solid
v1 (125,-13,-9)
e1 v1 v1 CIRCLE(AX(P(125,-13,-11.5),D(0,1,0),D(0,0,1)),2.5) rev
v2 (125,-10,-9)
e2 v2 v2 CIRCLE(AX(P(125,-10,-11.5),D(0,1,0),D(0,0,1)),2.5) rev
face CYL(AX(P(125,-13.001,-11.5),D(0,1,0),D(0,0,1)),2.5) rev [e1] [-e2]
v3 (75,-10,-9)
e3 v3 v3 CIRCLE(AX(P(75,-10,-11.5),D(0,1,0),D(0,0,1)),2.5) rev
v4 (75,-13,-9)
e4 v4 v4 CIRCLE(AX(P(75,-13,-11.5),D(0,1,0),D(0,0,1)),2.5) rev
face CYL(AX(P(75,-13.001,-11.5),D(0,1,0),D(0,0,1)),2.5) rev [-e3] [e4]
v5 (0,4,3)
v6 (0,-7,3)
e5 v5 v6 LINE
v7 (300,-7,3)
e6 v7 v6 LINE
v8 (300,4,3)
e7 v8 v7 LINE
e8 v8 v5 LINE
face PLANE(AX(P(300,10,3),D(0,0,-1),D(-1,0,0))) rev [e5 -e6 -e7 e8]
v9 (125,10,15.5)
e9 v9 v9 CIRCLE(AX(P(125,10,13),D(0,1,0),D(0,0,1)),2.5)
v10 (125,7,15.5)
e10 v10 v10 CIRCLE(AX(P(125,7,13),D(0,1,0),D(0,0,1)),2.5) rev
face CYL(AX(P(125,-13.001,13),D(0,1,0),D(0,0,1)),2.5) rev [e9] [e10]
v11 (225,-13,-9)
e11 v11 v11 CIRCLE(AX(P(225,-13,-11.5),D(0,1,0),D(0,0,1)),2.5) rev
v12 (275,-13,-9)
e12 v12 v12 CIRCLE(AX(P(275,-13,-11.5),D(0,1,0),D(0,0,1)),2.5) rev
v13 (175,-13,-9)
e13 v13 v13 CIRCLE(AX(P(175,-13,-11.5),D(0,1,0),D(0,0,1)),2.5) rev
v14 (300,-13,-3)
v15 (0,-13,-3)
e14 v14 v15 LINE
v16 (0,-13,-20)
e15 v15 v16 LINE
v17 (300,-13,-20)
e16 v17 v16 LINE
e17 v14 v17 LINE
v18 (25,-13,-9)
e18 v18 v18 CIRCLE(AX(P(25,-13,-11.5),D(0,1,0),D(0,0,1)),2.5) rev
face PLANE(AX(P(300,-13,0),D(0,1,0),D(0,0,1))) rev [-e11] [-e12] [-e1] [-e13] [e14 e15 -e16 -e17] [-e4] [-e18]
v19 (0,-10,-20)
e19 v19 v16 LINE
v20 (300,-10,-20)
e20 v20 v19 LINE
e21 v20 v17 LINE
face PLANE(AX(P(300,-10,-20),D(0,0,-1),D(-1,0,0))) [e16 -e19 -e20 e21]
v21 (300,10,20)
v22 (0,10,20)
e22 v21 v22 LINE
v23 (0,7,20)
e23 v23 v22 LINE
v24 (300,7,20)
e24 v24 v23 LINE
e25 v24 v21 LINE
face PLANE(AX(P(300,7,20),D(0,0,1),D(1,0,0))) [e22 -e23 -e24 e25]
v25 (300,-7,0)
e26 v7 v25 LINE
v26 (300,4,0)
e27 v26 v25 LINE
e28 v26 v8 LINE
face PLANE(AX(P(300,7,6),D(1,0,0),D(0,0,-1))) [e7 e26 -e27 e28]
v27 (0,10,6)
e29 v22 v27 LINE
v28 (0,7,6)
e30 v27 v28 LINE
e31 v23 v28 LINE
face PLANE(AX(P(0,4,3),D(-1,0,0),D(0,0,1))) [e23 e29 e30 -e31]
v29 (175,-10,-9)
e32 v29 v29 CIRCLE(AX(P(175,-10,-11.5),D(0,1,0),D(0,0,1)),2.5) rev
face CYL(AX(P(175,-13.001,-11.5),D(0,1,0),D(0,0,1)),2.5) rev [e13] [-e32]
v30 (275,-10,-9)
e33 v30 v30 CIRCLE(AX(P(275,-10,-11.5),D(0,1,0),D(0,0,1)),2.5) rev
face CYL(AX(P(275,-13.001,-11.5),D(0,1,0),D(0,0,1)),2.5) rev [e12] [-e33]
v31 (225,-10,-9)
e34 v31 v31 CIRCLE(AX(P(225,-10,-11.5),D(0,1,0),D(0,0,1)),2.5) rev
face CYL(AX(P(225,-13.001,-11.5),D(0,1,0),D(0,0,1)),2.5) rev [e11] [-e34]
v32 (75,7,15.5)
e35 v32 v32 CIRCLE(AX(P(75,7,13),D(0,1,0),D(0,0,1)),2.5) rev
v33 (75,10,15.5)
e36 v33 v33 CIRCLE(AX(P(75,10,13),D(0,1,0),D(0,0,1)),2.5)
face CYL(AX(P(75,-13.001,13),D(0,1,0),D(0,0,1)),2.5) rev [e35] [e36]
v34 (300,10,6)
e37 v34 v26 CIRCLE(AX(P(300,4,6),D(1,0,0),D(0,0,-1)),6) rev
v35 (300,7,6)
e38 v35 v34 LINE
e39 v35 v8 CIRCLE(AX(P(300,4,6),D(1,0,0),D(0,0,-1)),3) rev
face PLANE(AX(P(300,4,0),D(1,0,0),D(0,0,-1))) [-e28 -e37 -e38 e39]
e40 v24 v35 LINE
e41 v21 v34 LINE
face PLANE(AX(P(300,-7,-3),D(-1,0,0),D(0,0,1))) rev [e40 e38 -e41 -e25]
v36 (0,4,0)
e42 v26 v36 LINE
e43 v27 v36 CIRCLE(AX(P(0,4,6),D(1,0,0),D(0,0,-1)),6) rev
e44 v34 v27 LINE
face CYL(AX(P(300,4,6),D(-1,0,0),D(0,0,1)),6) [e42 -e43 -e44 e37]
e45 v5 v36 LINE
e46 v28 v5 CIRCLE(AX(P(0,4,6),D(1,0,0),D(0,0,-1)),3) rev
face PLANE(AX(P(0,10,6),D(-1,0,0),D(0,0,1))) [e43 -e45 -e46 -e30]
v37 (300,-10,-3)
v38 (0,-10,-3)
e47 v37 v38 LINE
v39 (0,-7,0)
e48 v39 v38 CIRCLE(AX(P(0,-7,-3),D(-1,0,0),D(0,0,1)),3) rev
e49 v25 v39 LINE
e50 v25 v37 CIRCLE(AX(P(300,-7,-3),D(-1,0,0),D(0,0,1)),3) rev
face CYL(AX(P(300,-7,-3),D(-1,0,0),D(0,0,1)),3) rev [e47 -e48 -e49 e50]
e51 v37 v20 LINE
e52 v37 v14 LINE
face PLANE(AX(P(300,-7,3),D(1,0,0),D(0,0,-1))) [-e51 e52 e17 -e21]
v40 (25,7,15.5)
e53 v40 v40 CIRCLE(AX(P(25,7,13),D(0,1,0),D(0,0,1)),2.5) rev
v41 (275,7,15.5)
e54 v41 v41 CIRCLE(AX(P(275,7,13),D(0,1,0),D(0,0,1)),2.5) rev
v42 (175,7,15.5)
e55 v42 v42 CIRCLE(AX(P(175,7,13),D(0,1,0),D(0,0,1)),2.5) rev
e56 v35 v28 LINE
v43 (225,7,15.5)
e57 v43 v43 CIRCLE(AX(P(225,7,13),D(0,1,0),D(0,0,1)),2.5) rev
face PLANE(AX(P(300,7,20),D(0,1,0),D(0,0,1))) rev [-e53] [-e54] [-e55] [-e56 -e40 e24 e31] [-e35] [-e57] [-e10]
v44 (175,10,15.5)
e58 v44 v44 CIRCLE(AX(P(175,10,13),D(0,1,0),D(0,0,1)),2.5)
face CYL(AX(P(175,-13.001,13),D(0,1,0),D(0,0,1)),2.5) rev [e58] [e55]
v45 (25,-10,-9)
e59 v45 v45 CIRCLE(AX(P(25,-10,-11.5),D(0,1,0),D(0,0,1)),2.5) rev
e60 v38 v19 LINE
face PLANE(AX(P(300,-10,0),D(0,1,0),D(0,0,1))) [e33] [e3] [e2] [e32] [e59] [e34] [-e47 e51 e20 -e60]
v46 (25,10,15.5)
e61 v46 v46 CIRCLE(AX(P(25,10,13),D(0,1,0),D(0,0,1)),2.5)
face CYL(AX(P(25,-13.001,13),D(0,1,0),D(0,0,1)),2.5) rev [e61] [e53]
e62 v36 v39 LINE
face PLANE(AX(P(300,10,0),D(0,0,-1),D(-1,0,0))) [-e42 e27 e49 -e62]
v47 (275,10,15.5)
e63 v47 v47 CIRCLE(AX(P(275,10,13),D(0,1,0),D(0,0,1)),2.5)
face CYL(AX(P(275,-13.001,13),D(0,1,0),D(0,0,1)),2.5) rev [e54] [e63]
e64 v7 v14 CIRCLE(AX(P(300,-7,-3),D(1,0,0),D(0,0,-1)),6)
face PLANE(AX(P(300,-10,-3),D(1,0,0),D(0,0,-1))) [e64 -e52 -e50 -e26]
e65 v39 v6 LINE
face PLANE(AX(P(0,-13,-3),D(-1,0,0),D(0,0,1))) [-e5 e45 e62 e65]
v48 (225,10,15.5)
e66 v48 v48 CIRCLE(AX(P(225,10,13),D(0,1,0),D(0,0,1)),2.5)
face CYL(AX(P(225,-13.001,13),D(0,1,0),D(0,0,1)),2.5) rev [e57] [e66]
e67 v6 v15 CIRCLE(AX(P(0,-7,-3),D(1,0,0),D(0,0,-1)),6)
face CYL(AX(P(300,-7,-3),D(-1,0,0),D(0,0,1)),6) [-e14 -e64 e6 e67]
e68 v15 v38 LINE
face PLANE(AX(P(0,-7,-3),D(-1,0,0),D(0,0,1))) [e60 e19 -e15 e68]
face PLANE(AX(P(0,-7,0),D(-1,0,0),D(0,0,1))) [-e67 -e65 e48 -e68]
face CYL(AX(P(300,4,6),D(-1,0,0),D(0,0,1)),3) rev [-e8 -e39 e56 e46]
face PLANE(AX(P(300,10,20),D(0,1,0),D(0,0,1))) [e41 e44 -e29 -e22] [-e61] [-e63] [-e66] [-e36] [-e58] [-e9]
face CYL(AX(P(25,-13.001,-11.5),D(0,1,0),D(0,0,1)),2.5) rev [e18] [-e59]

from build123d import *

# Parameters (mm, degrees)
BASE_FLANGE1_DEPTH = 300
CUT_EXTRUDE1_REACH = 303.544
SKETCH6_R          = 2.5


# Sheet-metal steps are written as plain solids
with BuildPart() as part:
    # Sketch1 → Base-Flange1 (new body)
    with BuildSketch(Plane(origin=(0, 0, 0), x_dir=(0, 0, -1), z_dir=(1, 0, 0))):
        with BuildLine():
            Line((-20, 10), (-6, 10))
            ThreePointArc((-6, 10), (-1.757359313, 8.242640687), (0, 4))
            Line((0, 4), (0, -7))
            ThreePointArc((0, -7), (0.878679656, -9.121320344), (3, -10))
            Line((3, -10), (20, -10))
            Line((20, -10), (20, -13))
            Line((20, -13), (3, -13))
            ThreePointArc((3, -13), (-1.242640687, -11.242640687), (-3, -7))
            Line((-3, -7), (-3, 4))
            ThreePointArc((-3, 4), (-3.878679656, 6.121320344), (-6, 7))
            Line((-6, 7), (-20, 7))
            Line((-20, 7), (-20, 10))
        make_face()
    extrude(amount=BASE_FLANGE1_DEPTH)

    # Sketch6 → Cut-Extrude1 (cut, up to next)
    with BuildSketch(Plane(origin=(0, 10, 0), x_dir=(1, 0, 0), z_dir=(0, 1, 0)), mode=Mode.PRIVATE) as cut_extrude1_sk1:
        with Locations(Location((25, -13, 0), (0, 0, 270))):
            Circle(SKETCH6_R)
    cut_extrude1_tool1 = extrude(cut_extrude1_sk1.sketch, amount=-CUT_EXTRUDE1_REACH, mode=Mode.PRIVATE) & part.part
    # Sketch6 → Cut-Extrude1 (cut, up to next)
    with BuildSketch(Plane(origin=(0, 10, 0), x_dir=(1, 0, 0), z_dir=(0, 1, 0)), mode=Mode.PRIVATE) as cut_extrude1_sk2:
        with Locations(Location((75, -13, 0), (0, 0, 270))):
            Circle(SKETCH6_R)
    cut_extrude1_tool2 = extrude(cut_extrude1_sk2.sketch, amount=-CUT_EXTRUDE1_REACH, mode=Mode.PRIVATE) & part.part
    # Sketch6 → Cut-Extrude1 (cut, up to next)
    with BuildSketch(Plane(origin=(0, 10, 0), x_dir=(1, 0, 0), z_dir=(0, 1, 0)), mode=Mode.PRIVATE) as cut_extrude1_sk3:
        with Locations(Location((125, -13, 0), (0, 0, 270))):
            Circle(SKETCH6_R)
    cut_extrude1_tool3 = extrude(cut_extrude1_sk3.sketch, amount=-CUT_EXTRUDE1_REACH, mode=Mode.PRIVATE) & part.part
    # Sketch6 → Cut-Extrude1 (cut, up to next)
    with BuildSketch(Plane(origin=(0, 10, 0), x_dir=(1, 0, 0), z_dir=(0, 1, 0)), mode=Mode.PRIVATE) as cut_extrude1_sk4:
        with Locations(Location((175, -13, 0), (0, 0, 270))):
            Circle(SKETCH6_R)
    cut_extrude1_tool4 = extrude(cut_extrude1_sk4.sketch, amount=-CUT_EXTRUDE1_REACH, mode=Mode.PRIVATE) & part.part
    # Sketch6 → Cut-Extrude1 (cut, up to next)
    with BuildSketch(Plane(origin=(0, 10, 0), x_dir=(1, 0, 0), z_dir=(0, 1, 0)), mode=Mode.PRIVATE) as cut_extrude1_sk5:
        with Locations(Location((225, -13, 0), (0, 0, 270))):
            Circle(SKETCH6_R)
    cut_extrude1_tool5 = extrude(cut_extrude1_sk5.sketch, amount=-CUT_EXTRUDE1_REACH, mode=Mode.PRIVATE) & part.part
    # Sketch6 → Cut-Extrude1 (cut, up to next)
    with BuildSketch(Plane(origin=(0, 10, 0), x_dir=(1, 0, 0), z_dir=(0, 1, 0)), mode=Mode.PRIVATE) as cut_extrude1_sk6:
        with Locations(Location((275, -13, 0), (0, 0, 270))):
            Circle(SKETCH6_R)
    cut_extrude1_tool6 = extrude(cut_extrude1_sk6.sketch, amount=-CUT_EXTRUDE1_REACH, mode=Mode.PRIVATE) & part.part
    # Sketch6 → Cut-Extrude1 (cut, up to next)
    with BuildSketch(Plane(origin=(0, 10, 0), x_dir=(1, 0, 0), z_dir=(0, 1, 0)), mode=Mode.PRIVATE) as cut_extrude1_sk7:
        with Locations(Location((75, 11.5, 0), (0, 0, 270))):
            Circle(SKETCH6_R)
    cut_extrude1_tool7 = extrude(cut_extrude1_sk7.sketch, amount=-CUT_EXTRUDE1_REACH, mode=Mode.PRIVATE) & part.part
    # Sketch6 → Cut-Extrude1 (cut, up to next)
    with BuildSketch(Plane(origin=(0, 10, 0), x_dir=(1, 0, 0), z_dir=(0, 1, 0)), mode=Mode.PRIVATE) as cut_extrude1_sk8:
        with Locations(Location((125, 11.5, 0), (0, 0, 270))):
            Circle(SKETCH6_R)
    cut_extrude1_tool8 = extrude(cut_extrude1_sk8.sketch, amount=-CUT_EXTRUDE1_REACH, mode=Mode.PRIVATE) & part.part
    # Sketch6 → Cut-Extrude1 (cut, up to next)
    with BuildSketch(Plane(origin=(0, 10, 0), x_dir=(1, 0, 0), z_dir=(0, 1, 0)), mode=Mode.PRIVATE) as cut_extrude1_sk9:
        with Locations(Location((175, 11.5, 0), (0, 0, 270))):
            Circle(SKETCH6_R)
    cut_extrude1_tool9 = extrude(cut_extrude1_sk9.sketch, amount=-CUT_EXTRUDE1_REACH, mode=Mode.PRIVATE) & part.part
    # Sketch6 → Cut-Extrude1 (cut, up to next)
    with BuildSketch(Plane(origin=(0, 10, 0), x_dir=(1, 0, 0), z_dir=(0, 1, 0)), mode=Mode.PRIVATE) as cut_extrude1_sk10:
        with Locations(Location((225, 11.5, 0), (0, 0, 270))):
            Circle(SKETCH6_R)
    cut_extrude1_tool10 = extrude(cut_extrude1_sk10.sketch, amount=-CUT_EXTRUDE1_REACH, mode=Mode.PRIVATE) & part.part
    # Sketch6 → Cut-Extrude1 (cut, up to next)
    with BuildSketch(Plane(origin=(0, 10, 0), x_dir=(1, 0, 0), z_dir=(0, 1, 0)), mode=Mode.PRIVATE) as cut_extrude1_sk11:
        with Locations(Location((275, 11.5, 0), (0, 0, 270))):
            Circle(SKETCH6_R)
    cut_extrude1_tool11 = extrude(cut_extrude1_sk11.sketch, amount=-CUT_EXTRUDE1_REACH, mode=Mode.PRIVATE) & part.part
    # Sketch6 → Cut-Extrude1 (cut, up to next)
    with BuildSketch(Plane(origin=(0, 10, 0), x_dir=(1, 0, 0), z_dir=(0, 1, 0)), mode=Mode.PRIVATE) as cut_extrude1_sk12:
        with Locations(Location((25, 11.5, 0), (0, 0, 270))):
            Circle(SKETCH6_R)
    cut_extrude1_tool12 = extrude(cut_extrude1_sk12.sketch, amount=-CUT_EXTRUDE1_REACH, mode=Mode.PRIVATE) & part.part
    add(cut_extrude1_tool1.solids().sort_by_distance((25, 10, 13))[0], mode=Mode.SUBTRACT)
    add(cut_extrude1_tool2.solids().sort_by_distance((75, 10, 13))[0], mode=Mode.SUBTRACT)
    add(cut_extrude1_tool3.solids().sort_by_distance((125, 10, 13))[0], mode=Mode.SUBTRACT)
    add(cut_extrude1_tool4.solids().sort_by_distance((175, 10, 13))[0], mode=Mode.SUBTRACT)
    add(cut_extrude1_tool5.solids().sort_by_distance((225, 10, 13))[0], mode=Mode.SUBTRACT)
    add(cut_extrude1_tool6.solids().sort_by_distance((275, 10, 13))[0], mode=Mode.SUBTRACT)
    add(cut_extrude1_tool7.solids().sort_by_distance((75, 10, -11.5))[0], mode=Mode.SUBTRACT)
    add(cut_extrude1_tool8.solids().sort_by_distance((125, 10, -11.5))[0], mode=Mode.SUBTRACT)
    add(cut_extrude1_tool9.solids().sort_by_distance((175, 10, -11.5))[0], mode=Mode.SUBTRACT)
    add(cut_extrude1_tool10.solids().sort_by_distance((225, 10, -11.5))[0], mode=Mode.SUBTRACT)
    add(cut_extrude1_tool11.solids().sort_by_distance((275, 10, -11.5))[0], mode=Mode.SUBTRACT)
    add(cut_extrude1_tool12.solids().sort_by_distance((25, 10, -11.5))[0], mode=Mode.SUBTRACT)


solid = part.part
